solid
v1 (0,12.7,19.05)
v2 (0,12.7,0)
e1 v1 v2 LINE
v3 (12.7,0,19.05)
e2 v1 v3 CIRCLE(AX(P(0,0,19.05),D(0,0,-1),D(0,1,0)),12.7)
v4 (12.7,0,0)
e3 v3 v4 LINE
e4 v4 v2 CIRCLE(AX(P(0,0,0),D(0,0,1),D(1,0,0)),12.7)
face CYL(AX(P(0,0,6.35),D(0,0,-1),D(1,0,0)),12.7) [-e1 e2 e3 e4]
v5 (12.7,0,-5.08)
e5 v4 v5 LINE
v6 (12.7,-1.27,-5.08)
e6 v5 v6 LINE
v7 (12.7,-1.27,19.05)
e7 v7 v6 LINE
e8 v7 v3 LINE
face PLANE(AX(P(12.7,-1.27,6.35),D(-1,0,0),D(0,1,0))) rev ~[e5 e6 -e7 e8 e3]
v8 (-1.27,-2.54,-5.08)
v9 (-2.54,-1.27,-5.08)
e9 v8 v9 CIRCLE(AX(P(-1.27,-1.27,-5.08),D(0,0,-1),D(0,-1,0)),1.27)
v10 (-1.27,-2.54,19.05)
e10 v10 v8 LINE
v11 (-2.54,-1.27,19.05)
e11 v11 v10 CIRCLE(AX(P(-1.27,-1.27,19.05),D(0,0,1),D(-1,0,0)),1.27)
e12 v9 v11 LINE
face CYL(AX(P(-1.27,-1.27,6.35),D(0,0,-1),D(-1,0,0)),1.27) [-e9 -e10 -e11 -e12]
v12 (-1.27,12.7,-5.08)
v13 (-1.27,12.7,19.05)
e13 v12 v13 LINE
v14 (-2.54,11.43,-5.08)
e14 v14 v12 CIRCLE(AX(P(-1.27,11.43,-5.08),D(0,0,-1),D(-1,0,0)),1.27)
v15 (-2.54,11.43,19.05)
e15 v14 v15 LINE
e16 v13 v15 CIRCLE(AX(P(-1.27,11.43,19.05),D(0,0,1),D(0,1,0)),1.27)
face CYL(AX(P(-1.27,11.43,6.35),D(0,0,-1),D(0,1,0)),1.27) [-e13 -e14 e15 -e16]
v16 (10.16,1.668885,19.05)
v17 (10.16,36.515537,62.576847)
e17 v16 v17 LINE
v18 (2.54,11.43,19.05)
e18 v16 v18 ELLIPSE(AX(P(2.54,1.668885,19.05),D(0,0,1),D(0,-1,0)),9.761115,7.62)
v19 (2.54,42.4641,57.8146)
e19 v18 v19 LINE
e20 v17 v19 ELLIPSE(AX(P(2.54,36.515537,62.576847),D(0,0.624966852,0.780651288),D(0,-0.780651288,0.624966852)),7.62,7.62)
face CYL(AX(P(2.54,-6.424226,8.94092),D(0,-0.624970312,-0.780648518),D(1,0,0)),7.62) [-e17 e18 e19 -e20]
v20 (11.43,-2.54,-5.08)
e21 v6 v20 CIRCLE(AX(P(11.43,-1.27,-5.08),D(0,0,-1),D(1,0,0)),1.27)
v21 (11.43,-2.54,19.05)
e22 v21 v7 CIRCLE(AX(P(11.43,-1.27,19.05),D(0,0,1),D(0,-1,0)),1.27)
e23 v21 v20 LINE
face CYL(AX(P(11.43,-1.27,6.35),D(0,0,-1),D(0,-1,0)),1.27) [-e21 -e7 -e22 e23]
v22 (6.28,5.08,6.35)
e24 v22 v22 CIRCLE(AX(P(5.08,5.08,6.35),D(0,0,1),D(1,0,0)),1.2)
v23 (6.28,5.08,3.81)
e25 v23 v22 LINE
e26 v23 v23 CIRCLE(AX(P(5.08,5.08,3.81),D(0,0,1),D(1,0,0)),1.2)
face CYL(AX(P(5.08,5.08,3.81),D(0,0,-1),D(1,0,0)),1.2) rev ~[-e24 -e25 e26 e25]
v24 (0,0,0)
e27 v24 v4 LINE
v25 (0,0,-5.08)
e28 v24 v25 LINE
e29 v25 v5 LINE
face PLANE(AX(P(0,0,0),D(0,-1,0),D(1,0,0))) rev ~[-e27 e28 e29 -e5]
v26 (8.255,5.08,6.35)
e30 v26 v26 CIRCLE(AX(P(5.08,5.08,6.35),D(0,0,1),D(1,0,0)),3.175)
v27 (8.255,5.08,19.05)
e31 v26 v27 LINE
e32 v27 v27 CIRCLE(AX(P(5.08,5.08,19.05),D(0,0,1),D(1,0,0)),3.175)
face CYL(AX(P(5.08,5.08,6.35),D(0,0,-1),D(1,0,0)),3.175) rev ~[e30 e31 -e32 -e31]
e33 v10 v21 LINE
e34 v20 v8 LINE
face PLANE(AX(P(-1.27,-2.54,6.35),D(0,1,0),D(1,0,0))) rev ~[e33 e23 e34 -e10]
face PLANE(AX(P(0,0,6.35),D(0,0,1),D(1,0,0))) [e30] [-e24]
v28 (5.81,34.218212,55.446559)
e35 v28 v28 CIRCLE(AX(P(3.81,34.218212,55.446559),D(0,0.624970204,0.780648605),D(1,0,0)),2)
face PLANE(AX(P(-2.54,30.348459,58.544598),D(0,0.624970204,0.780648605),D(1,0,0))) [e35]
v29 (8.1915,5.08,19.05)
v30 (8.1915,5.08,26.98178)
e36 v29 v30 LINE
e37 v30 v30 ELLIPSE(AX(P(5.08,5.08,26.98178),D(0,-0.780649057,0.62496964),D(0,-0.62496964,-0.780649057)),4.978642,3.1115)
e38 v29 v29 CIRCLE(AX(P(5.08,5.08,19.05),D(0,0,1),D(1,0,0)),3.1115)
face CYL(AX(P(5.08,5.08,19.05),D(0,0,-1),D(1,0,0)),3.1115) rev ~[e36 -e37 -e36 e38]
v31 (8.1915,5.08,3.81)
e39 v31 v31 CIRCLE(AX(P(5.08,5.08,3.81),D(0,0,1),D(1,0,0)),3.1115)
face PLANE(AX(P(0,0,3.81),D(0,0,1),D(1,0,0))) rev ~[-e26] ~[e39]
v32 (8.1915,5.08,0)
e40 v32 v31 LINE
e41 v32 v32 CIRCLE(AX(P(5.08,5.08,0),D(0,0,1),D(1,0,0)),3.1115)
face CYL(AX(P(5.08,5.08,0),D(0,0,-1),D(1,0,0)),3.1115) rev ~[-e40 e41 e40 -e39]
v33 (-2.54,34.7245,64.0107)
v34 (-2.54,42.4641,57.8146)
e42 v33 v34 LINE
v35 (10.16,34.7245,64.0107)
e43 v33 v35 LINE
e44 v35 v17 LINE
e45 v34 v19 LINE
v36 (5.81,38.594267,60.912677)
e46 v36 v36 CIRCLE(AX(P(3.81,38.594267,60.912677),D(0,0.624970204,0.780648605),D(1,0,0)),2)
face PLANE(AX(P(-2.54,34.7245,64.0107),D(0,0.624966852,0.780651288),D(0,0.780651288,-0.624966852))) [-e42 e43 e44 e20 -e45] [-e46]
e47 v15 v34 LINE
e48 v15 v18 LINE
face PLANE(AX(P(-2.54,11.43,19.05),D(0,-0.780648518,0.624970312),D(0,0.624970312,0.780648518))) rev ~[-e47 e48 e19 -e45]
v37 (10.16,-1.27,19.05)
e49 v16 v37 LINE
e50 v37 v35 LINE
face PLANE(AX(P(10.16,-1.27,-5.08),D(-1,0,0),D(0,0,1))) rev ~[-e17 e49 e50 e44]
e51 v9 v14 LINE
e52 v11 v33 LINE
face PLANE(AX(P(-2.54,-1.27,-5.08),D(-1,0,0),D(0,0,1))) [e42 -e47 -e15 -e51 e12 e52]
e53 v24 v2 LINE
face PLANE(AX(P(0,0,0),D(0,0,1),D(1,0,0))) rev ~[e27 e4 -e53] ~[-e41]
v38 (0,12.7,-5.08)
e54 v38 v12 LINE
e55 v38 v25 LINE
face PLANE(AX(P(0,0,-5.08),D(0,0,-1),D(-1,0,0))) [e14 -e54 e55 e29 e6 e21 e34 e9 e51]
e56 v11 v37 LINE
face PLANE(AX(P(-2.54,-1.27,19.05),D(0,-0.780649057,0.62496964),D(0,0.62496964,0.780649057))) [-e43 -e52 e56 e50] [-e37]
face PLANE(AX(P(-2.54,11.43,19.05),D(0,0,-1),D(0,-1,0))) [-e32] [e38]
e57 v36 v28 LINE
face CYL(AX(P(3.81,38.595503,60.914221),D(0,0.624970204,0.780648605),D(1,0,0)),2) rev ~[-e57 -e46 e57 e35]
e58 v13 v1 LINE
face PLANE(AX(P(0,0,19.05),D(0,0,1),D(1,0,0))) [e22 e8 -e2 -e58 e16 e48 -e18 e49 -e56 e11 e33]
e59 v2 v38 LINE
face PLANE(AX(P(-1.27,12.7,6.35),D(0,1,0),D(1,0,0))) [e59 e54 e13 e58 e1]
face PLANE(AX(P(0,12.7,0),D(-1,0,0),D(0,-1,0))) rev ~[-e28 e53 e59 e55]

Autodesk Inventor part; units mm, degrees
ref_plane "YZ Plane" through (0, 0, 0) normal (1, 0, 0) x (0, 1, 0)
ref_plane "XZ Plane" through (0, 0, 0) normal (0, 1, 0) x (-1, 0, 0)
ref_plane "XY Plane" through (0, 0, 0) normal (0, 0, 1) x (1, 0, 0)
sketch "Sketch1" plane through (0, 0, 0) normal (0, 0, 1) x (1, 0, 0)
  line L0 (0, 0) -> (12.7, 0)
  line L1 (0, 0) -> (0, 12.7)
  arc A0 (12.7, 0) -> (0, 12.7) centre (0, 0) ccw
  circle A1 centre (5.08, 5.08) radius 3.1115
  dimension "d0" = 12.7
  dimension "d2" = 6.223
  dimension "d3" = 5.08
  dimension "d4" = 5.08
extrude "Extrusion1" add sketch "Sketch1" along normal blind 3.81
sketch "Sketch2" plane through (0, 0, 0) normal (0, 0, -1) x (-1, 0, 0)
  arc A0 (0, 12.7) -> (-12.7, 0) centre (0, 0) ccw projected
  line L0 (0, 12.7) -> (0, 0) projected
  line L1 (0, 12.7) -> (0, 0)
  line L2 (0, 0) -> (-12.7, 0) projected
  line L3 (-12.7, 0) -> (0, 0)
  line L4 (0, 12.7) -> (1.27, 12.7)
  line L5 (-12.7, 0) -> (-12.7, -1.27)
  line L6 (-11.43, -2.54) -> (1.27, -2.54)
  line L7 (2.54, -1.27) -> (2.54, 11.43)
  arc A1 (2.54, 11.43) -> (1.27, 12.7) centre (1.27, 11.43) ccw
  arc A2 (1.27, -2.54) -> (2.54, -1.27) centre (1.27, -1.27) ccw
  arc A3 (-12.7, -1.27) -> (-11.43, -2.54) centre (-11.43, -1.27) ccw
  point P0 (2.54, 12.7)
  point P1 (-12.7, -2.54)
  dimension "d7" = 2.54
  dimension "d8" = 2.54
  dimension "d9" = 1.27
extrude "Extrusion2" add sketch "Sketch2" along normal blind 5.08 and the other way blind 3.81 contours L4 A1 L7 A2 L6 A3 L5 L2 L0
sketch "Sketch3" plane through (0, 0, 3.81) normal (0, 0, 1) x (1, 0, 0)
  circle A0 centre (5.08, 5.08) radius 3.1115 projected
  circle A1 centre (5.08, 5.08) radius 1.2
  arc A2 (12.7, 0) -> (0, 12.7) centre (0, 0) ccw projected
  arc A3 (12.7, 0) -> (0, 12.7) centre (0, 0) ccw
  line L0 (-1.27, -2.54) -> (11.43, -2.54)
  line L1 (12.7, -1.27) -> (12.7, 0)
  line L2 (-2.54, -1.27) -> (-2.54, 11.43)
  line L3 (-1.27, 12.7) -> (0, 12.7)
  arc A4 (11.43, -2.54) -> (12.7, -1.27) centre (11.43, -1.27) ccw
  arc A5 (-2.54, -1.27) -> (-1.27, -2.54) centre (-1.27, -1.27) ccw
  arc A6 (-1.27, 12.7) -> (-2.54, 11.43) centre (-1.27, 11.43) ccw
  point P0 (-2.54, -2.54)
  point P1 (12.7, -2.54)
  point P2 (-2.54, 12.7)
  dimension "d14" = 2.4
  dimension "d15" = 15.24
  dimension "d16" = 15.24
  dimension "d17" = 1.27
extrude "Extrusion3" add sketch "Sketch3" along normal blind 2.54 contours A0 | L1 A4 L0 A5 L2 A6 L3 A2
sketch "Sketch4" plane through (0, 0, 6.35) normal (0, 0, 1) x (1, 0, 0)
  line L0 (0, 0) -> (12.7, 0) projected
  line L1 (-1.27, 12.7) -> (0, 12.7) projected
  arc A0 (12.7, 0) -> (0, 12.7) centre (0, 0) ccw
  line L2 (0, 12.7) -> (-1.27, 12.7)
  line L3 (-2.54, 11.43) -> (-2.54, -1.27)
  line L4 (-1.27, -2.54) -> (11.43, -2.54)
  line L5 (12.7, -1.27) -> (12.7, 0)
  arc A1 (-1.27, 12.7) -> (-2.54, 11.43) centre (-1.27, 11.43) ccw
  arc A2 (-2.54, -1.27) -> (-1.27, -2.54) centre (-1.27, -1.27) ccw
  arc A3 (11.43, -2.54) -> (12.7, -1.27) centre (11.43, -1.27) ccw
  circle A4 centre (5.08, 5.08) radius 1.2 projected
  circle A5 centre (5.08, 5.08) radius 3.175
  point P0 (-2.54, 12.7)
  point P1 (-2.54, -2.54)
  point P2 (12.7, -2.54)
  dimension "d20" = 15.24
  dimension "d21" = 15.24
  dimension "d22" = 1.27
  dimension "d23" = 6.35
extrude "Extrusion4" add sketch "Sketch4" along normal blind 12.7 contours L1 A0 L5 A3 L4 A2 L3 A1
sketch "Sketch5" plane through (-2.54, -1.27, -5.08) normal (-1, 0, 0) x (0, 0, 1)
  line L0 (24.13, 0) -> (0, 0) projected
  line L1 (24.13, 0) -> (69.0907, 35.9945)
  line L2 (24.13, 12.7) -> (0, 12.7) projected
  line L3 (24.13, 12.7) -> (62.8946, 43.7341)
  line L4 (69.0907, 35.9945) -> (62.8946, 43.7341)
  line L5 (24.13, 12.7) -> (24.13, 13.97) projected
  line L6 (24.13, 12.7) -> (24.13, 0)
  point P0 (5.08, 1.27)
  dimension "d26" = 141.32
  dimension "d27" = 141.32
  dimension "d28" = 57.594
extrude "Extrusion5" add sketch "Sketch5" against normal blind 12.7
sketch "Sketch6" plane through (0, 0, 19.05) normal (0, 0, 1) x (1, 0, 0)
  circle A0 centre (5.08, 5.08) radius 1.2 projected
  circle A1 centre (5.08, 5.08) radius 3.1115
  point P0 (0, 0)
  dimension "d31" = 6.223
extrude "Extrusion6" cut sketch "Sketch6" along normal blind 12.7 contours A0 | A1
sketch "Sketch7" plane through (-2.54, 34.7245, 64.0107) normal (0, 0.6249702, 0.7806486) x (1, 0, 0)
  line L0 (8.0758, 9.9142) -> (12.7, 9.9142) construction
  line L1 (12.7, 0) -> (0, 0) construction
  line L2 (12.7, 9.9142) -> (0, 0) construction
  line L3 (0, 0) -> (0, 15.0805) construction
  line L4 (0, 9.9142) -> (12.7, 0) construction
  circle A0 centre (6.35, 4.9571) radius 2
  point P0 (2.54, 12.8971)
  dimension "d34" = 4
extrude "Extrusion7" cut sketch "Sketch7" against normal blind 7
fillet "Fillet1" radius 7.62 1 edges at (10.16, 26.947, 38.4323)
equation "\"d34\" = m3_heat_set_insert"
equation "\"d35\" = m3_heat_set_depth"
equation "\"m3_heat_set_insert\" = 4"
equation "\"m3_clearance\" = 3.4"
equation "\"m3_heat_set_depth\" = 7"
equation "\"robot_diameter\" = 354"
equation "\"hardboard_thickness\" = 5"
properties part number "display_top_support_left"
